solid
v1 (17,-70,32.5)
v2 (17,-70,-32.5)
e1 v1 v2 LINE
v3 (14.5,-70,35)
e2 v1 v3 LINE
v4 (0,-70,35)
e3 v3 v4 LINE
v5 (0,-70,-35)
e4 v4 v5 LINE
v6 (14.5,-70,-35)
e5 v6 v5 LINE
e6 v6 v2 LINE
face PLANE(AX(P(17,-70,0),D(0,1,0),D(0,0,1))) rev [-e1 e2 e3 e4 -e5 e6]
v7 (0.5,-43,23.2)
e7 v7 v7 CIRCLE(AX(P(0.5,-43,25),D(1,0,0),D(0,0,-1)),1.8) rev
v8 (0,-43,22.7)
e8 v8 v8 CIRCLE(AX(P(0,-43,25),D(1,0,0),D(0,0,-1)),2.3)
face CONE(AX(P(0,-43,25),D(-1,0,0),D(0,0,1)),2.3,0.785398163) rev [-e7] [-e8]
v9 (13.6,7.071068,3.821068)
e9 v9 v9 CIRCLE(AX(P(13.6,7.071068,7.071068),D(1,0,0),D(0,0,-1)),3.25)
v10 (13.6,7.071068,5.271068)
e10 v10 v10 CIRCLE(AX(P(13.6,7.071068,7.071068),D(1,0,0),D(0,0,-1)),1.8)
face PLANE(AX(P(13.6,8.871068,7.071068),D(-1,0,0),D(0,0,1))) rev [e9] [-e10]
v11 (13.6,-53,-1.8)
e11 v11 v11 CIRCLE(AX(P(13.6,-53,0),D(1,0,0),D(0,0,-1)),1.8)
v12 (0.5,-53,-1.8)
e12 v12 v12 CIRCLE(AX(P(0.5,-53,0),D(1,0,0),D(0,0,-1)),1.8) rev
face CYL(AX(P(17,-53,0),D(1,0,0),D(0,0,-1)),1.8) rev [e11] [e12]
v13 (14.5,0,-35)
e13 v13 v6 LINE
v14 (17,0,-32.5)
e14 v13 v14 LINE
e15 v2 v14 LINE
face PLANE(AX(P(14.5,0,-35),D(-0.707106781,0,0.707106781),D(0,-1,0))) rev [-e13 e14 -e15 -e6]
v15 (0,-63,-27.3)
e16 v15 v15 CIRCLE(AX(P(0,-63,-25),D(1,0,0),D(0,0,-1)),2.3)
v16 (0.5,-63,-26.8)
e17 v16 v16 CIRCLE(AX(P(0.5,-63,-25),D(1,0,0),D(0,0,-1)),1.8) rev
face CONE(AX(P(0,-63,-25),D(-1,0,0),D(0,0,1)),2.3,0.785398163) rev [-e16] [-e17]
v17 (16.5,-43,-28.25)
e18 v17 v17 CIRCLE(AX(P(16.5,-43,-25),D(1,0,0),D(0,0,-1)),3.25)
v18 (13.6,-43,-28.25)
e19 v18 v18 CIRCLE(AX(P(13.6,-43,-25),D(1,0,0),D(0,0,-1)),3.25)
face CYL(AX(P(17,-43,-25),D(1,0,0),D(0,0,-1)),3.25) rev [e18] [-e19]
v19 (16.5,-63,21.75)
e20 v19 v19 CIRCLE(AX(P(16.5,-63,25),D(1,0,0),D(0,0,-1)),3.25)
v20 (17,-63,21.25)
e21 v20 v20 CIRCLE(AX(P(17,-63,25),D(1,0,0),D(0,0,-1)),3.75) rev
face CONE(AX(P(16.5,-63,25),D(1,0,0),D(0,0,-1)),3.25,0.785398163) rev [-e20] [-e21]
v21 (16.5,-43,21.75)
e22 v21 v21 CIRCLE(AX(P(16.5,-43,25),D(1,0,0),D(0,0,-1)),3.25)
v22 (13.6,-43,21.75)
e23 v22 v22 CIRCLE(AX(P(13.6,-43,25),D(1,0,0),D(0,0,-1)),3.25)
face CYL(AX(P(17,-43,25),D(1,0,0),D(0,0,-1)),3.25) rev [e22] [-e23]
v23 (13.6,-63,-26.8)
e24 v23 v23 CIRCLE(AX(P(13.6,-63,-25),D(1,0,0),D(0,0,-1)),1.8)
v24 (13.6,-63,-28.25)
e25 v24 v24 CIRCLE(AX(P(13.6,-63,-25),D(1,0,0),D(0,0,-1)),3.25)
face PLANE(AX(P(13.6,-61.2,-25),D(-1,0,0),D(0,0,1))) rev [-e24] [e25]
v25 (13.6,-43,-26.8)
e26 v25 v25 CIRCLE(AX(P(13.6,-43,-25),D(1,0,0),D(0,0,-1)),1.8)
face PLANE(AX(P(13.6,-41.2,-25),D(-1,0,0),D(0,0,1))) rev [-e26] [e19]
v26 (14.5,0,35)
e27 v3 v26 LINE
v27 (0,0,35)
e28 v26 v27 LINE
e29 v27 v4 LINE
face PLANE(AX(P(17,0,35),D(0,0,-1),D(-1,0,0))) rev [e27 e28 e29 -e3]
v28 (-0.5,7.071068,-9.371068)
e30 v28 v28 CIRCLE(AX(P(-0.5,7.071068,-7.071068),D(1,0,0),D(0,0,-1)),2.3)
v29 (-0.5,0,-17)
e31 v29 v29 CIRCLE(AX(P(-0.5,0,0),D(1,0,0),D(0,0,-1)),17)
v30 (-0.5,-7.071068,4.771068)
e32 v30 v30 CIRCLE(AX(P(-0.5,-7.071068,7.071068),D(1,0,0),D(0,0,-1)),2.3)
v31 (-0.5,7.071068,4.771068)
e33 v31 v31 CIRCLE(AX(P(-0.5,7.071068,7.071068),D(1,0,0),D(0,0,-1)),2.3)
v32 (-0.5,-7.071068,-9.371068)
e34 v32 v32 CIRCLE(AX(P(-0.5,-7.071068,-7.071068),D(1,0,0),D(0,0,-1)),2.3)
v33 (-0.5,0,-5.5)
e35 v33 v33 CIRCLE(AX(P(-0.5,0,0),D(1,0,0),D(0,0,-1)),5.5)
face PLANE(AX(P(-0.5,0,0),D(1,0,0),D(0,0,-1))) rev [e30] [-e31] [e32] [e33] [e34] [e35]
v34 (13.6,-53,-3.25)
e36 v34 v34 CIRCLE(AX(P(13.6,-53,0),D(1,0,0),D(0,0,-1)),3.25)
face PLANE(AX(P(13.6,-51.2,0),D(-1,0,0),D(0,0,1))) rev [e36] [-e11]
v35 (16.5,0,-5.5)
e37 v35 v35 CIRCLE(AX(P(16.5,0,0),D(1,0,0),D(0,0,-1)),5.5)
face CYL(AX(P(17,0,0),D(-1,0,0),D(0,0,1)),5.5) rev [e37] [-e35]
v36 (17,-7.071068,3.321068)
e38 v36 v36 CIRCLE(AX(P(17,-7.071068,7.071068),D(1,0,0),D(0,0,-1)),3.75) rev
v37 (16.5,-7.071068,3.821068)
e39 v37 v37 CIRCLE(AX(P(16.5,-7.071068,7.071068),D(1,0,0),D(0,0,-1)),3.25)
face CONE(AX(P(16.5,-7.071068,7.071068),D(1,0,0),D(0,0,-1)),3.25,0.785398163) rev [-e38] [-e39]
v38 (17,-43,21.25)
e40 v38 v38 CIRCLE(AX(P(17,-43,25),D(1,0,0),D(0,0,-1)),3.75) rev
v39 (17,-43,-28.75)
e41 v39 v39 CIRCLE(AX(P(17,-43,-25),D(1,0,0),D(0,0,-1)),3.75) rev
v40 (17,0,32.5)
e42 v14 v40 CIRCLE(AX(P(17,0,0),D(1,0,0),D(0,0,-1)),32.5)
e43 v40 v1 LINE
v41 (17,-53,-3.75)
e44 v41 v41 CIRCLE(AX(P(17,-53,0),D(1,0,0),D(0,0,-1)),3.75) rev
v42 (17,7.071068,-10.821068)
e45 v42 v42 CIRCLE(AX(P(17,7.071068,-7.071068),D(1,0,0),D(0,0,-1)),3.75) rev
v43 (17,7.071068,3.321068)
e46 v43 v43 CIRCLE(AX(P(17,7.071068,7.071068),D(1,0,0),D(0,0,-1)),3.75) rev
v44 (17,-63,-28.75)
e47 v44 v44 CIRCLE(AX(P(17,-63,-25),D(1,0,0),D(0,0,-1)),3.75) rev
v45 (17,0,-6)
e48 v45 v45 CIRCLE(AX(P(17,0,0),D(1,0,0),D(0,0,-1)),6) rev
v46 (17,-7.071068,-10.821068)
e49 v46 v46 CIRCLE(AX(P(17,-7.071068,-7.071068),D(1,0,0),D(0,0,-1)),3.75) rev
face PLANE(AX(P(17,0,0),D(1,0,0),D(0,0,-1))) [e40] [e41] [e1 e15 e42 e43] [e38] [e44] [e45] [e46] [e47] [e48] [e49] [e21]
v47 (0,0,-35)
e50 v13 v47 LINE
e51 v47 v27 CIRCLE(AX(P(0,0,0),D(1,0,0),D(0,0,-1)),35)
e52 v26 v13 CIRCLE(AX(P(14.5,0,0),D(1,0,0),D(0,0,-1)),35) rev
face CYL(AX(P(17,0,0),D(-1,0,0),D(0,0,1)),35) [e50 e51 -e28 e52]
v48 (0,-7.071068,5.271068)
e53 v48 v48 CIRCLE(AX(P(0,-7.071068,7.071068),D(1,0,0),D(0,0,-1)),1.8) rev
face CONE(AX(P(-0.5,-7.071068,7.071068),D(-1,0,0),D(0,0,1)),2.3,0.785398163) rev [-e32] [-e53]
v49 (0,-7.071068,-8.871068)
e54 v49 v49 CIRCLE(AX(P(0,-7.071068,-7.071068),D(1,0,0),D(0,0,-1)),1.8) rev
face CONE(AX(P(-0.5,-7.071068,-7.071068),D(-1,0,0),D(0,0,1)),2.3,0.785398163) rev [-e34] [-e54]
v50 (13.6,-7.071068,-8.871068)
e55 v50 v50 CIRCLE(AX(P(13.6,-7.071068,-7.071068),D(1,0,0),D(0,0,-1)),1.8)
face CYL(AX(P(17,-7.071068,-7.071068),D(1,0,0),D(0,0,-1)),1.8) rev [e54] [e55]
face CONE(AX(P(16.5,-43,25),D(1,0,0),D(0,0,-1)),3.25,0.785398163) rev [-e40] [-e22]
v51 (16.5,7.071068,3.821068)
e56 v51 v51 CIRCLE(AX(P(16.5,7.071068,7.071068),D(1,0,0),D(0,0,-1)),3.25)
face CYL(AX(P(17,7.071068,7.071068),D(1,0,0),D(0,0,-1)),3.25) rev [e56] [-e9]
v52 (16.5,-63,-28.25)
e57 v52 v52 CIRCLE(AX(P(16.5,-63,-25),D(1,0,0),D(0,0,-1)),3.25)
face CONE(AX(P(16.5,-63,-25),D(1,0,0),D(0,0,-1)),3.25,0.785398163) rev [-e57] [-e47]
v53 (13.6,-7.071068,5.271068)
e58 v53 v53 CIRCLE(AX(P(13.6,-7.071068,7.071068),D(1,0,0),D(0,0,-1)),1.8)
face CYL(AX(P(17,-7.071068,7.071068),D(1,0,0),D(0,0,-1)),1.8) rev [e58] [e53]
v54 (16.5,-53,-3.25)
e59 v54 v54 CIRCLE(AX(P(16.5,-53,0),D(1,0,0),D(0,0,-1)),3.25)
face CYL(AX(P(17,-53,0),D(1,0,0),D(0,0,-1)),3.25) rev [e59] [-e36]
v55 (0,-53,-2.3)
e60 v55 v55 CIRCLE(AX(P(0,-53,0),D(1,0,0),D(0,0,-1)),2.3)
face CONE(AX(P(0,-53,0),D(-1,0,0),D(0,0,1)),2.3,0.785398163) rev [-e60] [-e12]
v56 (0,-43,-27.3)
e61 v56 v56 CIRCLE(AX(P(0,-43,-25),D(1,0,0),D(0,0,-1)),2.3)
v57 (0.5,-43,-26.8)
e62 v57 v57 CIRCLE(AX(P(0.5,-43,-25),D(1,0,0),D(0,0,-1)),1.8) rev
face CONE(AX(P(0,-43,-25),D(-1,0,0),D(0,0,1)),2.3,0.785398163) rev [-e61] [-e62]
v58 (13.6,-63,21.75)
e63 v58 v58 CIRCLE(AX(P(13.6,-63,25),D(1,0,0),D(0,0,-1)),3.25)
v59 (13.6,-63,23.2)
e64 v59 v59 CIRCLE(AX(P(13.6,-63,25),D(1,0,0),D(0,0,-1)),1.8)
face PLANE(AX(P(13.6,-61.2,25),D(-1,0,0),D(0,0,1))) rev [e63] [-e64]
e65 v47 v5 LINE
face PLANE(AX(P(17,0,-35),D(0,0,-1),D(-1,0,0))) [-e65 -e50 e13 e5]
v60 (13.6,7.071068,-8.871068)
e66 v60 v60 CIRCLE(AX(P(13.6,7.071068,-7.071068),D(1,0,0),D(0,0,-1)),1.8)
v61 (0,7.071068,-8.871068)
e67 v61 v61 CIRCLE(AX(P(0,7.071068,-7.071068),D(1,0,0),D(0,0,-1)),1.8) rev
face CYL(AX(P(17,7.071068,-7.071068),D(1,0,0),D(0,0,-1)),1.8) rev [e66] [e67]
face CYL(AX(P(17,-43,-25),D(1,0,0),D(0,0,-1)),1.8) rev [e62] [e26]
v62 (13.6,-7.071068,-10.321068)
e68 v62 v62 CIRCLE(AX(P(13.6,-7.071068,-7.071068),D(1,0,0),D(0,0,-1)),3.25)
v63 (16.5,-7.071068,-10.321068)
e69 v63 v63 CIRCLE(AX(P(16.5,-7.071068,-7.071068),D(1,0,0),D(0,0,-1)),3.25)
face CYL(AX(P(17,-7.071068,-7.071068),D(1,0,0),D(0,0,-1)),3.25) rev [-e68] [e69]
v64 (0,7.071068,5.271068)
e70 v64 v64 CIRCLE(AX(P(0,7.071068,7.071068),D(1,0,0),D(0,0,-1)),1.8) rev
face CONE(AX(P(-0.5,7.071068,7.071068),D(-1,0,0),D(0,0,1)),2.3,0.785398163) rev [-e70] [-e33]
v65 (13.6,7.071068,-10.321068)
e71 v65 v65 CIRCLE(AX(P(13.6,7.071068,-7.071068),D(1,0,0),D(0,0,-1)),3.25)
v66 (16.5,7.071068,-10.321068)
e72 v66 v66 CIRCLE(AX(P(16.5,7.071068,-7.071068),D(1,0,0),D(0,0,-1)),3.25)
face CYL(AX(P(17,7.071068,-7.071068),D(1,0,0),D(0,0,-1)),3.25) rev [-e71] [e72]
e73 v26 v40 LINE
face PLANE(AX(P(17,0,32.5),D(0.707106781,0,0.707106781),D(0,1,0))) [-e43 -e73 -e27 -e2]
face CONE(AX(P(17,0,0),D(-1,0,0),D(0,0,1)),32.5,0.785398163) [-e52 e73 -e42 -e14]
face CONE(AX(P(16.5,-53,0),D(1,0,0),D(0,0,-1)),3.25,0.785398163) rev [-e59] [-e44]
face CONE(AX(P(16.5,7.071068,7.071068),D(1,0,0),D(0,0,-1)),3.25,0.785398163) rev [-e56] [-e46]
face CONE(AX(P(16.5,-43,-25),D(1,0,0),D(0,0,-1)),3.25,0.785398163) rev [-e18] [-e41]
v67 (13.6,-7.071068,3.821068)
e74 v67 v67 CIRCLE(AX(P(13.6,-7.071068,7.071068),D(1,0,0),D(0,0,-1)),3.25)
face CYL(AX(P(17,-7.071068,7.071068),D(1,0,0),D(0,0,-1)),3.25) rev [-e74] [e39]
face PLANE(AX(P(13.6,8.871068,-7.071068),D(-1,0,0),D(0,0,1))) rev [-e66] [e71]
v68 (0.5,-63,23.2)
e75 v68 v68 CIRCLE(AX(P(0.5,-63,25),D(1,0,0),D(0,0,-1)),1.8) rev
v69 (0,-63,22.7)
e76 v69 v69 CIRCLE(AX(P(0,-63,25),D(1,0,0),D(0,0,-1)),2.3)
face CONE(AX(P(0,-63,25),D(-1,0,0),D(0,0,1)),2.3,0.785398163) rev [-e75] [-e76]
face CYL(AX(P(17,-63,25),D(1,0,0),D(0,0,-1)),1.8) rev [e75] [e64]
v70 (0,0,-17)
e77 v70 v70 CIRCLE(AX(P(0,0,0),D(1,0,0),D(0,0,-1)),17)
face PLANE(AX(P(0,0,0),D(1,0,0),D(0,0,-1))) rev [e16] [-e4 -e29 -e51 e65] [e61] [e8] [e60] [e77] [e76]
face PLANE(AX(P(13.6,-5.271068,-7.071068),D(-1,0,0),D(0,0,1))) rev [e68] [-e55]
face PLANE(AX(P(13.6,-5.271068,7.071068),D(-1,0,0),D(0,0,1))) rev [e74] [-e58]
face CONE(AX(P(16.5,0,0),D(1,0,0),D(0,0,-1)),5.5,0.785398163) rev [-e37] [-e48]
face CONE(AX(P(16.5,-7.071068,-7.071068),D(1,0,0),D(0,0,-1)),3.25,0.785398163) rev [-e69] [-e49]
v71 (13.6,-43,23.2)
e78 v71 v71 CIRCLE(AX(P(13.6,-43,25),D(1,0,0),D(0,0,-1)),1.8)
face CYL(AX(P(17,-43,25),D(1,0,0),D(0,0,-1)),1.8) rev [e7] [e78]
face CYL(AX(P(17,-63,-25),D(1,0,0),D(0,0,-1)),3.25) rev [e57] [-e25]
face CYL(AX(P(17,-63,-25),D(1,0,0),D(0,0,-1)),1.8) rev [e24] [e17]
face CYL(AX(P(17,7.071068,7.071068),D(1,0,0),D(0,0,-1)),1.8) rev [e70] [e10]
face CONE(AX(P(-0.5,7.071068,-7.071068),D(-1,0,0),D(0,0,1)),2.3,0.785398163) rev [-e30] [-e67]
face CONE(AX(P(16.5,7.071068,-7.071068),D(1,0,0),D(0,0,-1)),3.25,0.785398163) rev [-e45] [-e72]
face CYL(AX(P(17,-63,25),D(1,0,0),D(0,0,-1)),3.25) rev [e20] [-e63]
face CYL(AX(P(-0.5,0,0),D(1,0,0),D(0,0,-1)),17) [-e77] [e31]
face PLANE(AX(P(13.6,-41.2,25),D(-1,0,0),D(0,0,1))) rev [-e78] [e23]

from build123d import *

# Parameters (mm, degrees)
BOSS_EXTRUDE1_DEPTH                           = 17
BOSS_EXTRUDE2_START                           = -0.5
BOSS_EXTRUDE2_DEPTH                           = 0.5
CBORE_START                                   = -0.5
CBORE_FOR_M3_HEX_SOCKET_HEAD_CAP_SCR_2_R      = 1.8
CBORE_FOR_M3_HEX_SOCKET_HEAD_CAP_SCREW1_DEPTH = 17.5
CBORE_START_2                                 = 13.6
CBORE_FOR_M3_HEX_SOCKET_HEAD_CAP_SCR_3_O_R    = 3.25
CBORE_FOR_M3_HEX_SOCKET_HEAD_CAP_SCR_3_O_R_2  = 1.8
CBORE_FOR_M3_HEX_SOCKET_HEAD_CAP_SCR_3_DEPTH  = 3.4
F_2_5MM_CHAMFER1_SIZE                         = 2.5
F_0_5MM_CHAMFER2_SIZE                         = 0.5


# Read off the part's stored shape, not the designer's step: CBORE for M3 Hex Socket Head Cap Screw1
with BuildPart() as part:
    # Sketch1 → Boss-Extrude1 (new body)
    with BuildSketch(Plane(origin=(0, 0, 0), x_dir=(0, 0, -1), z_dir=(1, 0, 0))):
        with BuildLine():
            ThreePointArc((-17, 0), (0, 17), (17, 0))
            Line((17, 0), (35, 0))
            ThreePointArc((35, 0), (0, 35), (-35, 0))
            Line((-35, 0), (-17, 0))
        make_face()
        with BuildLine():
            Line((35, 0), (17, 0))
            ThreePointArc((17, 0), (0, -17), (-17, 0))
            Line((-17, 0), (-35, 0))
            ThreePointArc((-35, 0), (0, -35), (35, 0))
        make_face()
        with BuildLine():
            ThreePointArc((-5.5, 0), (0, 5.5), (5.5, 0))
            Line((5.5, 0), (17, 0))
            ThreePointArc((17, 0), (0, 17), (-17, 0))
            Line((-17, 0), (-5.5, 0))
        make_face()
        with BuildLine():
            Line((17, 0), (5.5, 0))
            ThreePointArc((5.5, 0), (0, -5.5), (-5.5, 0))
            Line((-5.5, 0), (-17, 0))
            ThreePointArc((-17, 0), (0, -17), (17, 0))
        make_face()
        with BuildLine():
            Line((35, -70), (35, 0))
            ThreePointArc((35, 0), (0, -35), (-35, 0))
            Line((-35, 0), (-35, -70))
            Line((-35, -70), (35, -70))
        make_face()
    extrude(amount=BOSS_EXTRUDE1_DEPTH)

    # Sketch1<4> → Boss-Extrude2 (add)
    with BuildSketch(Plane(origin=(0, 0, 0), x_dir=(0, 0, -1), z_dir=(1, 0, 0)).offset(BOSS_EXTRUDE2_START)):
        with BuildLine():
            ThreePointArc((-5.5, 0), (0, 5.5), (5.5, 0))
            Line((5.5, 0), (17, 0))
            ThreePointArc((17, 0), (0, 17), (-17, 0))
            Line((-17, 0), (-5.5, 0))
        make_face()
        with BuildLine():
            Line((17, 0), (5.5, 0))
            ThreePointArc((5.5, 0), (0, -5.5), (-5.5, 0))
            Line((-5.5, 0), (-17, 0))
            ThreePointArc((-17, 0), (0, -17), (17, 0))
        make_face()
    extrude(amount=BOSS_EXTRUDE2_DEPTH)

    # CBORE for M3 Hex Socket Head Cap Scr 2 → CBORE for M3 Hex Socket Head Cap Screw1 (cut)
    with BuildSketch(Plane.YZ.offset(CBORE_START)):
        with Locations((-63, -25)):
            Circle(CBORE_FOR_M3_HEX_SOCKET_HEAD_CAP_SCR_2_R)
        with Locations((-43, 25)):
            Circle(CBORE_FOR_M3_HEX_SOCKET_HEAD_CAP_SCR_2_R)
        with Locations((-63, 25)):
            Circle(CBORE_FOR_M3_HEX_SOCKET_HEAD_CAP_SCR_2_R)
        with Locations((-43, -25)):
            Circle(CBORE_FOR_M3_HEX_SOCKET_HEAD_CAP_SCR_2_R)
        with Locations((-53, 0)):
            Circle(CBORE_FOR_M3_HEX_SOCKET_HEAD_CAP_SCR_2_R)
        with Locations((7.071067812, 7.071067812)):
            Circle(CBORE_FOR_M3_HEX_SOCKET_HEAD_CAP_SCR_2_R)
        with Locations((-7.071067812, 7.071067812)):
            Circle(CBORE_FOR_M3_HEX_SOCKET_HEAD_CAP_SCR_2_R)
        with Locations((-7.071067812, -7.071067812)):
            Circle(CBORE_FOR_M3_HEX_SOCKET_HEAD_CAP_SCR_2_R)
        with Locations((7.071067812, -7.071067812)):
            Circle(CBORE_FOR_M3_HEX_SOCKET_HEAD_CAP_SCR_2_R)
    extrude(amount=CBORE_FOR_M3_HEX_SOCKET_HEAD_CAP_SCREW1_DEPTH, mode=Mode.SUBTRACT)

    # CBORE for M3 Hex Socket Head Cap Scr 3 o → CBORE for M3 Hex Socket Head Cap Scr 3 (cut)
    # profile 1 of 9: a face of its own
    with BuildSketch(Plane.YZ.offset(CBORE_START_2)):
        with Locations((-63, -25)):
            Circle(CBORE_FOR_M3_HEX_SOCKET_HEAD_CAP_SCR_3_O_R)
        with Locations((-63, -25)):
            Circle(CBORE_FOR_M3_HEX_SOCKET_HEAD_CAP_SCR_3_O_R_2, mode=Mode.SUBTRACT)
    # profile 2 of 9: a face of its own
    with BuildSketch(Plane.YZ.offset(CBORE_START_2)):
        with Locations((-43, 25)):
            Circle(CBORE_FOR_M3_HEX_SOCKET_HEAD_CAP_SCR_3_O_R)
        with Locations((-43, 25)):
            Circle(CBORE_FOR_M3_HEX_SOCKET_HEAD_CAP_SCR_3_O_R_2, mode=Mode.SUBTRACT)
    # profile 3 of 9: a face of its own
    with BuildSketch(Plane.YZ.offset(CBORE_START_2)):
        with Locations((-63, 25)):
            Circle(CBORE_FOR_M3_HEX_SOCKET_HEAD_CAP_SCR_3_O_R)
        with Locations((-63, 25)):
            Circle(CBORE_FOR_M3_HEX_SOCKET_HEAD_CAP_SCR_3_O_R_2, mode=Mode.SUBTRACT)
    # profile 4 of 9: a face of its own
    with BuildSketch(Plane.YZ.offset(CBORE_START_2)):
        with Locations((-43, -25)):
            Circle(CBORE_FOR_M3_HEX_SOCKET_HEAD_CAP_SCR_3_O_R)
        with Locations((-43, -25)):
            Circle(CBORE_FOR_M3_HEX_SOCKET_HEAD_CAP_SCR_3_O_R_2, mode=Mode.SUBTRACT)
    # profile 5 of 9: a face of its own
    with BuildSketch(Plane.YZ.offset(CBORE_START_2)):
        with Locations((-53, 0)):
            Circle(CBORE_FOR_M3_HEX_SOCKET_HEAD_CAP_SCR_3_O_R)
        with Locations((-53, 0)):
            Circle(CBORE_FOR_M3_HEX_SOCKET_HEAD_CAP_SCR_3_O_R_2, mode=Mode.SUBTRACT)
    # profile 6 of 9: a face of its own
    with BuildSketch(Plane.YZ.offset(CBORE_START_2)):
        with Locations((7.071067812, 7.071067812)):
            Circle(CBORE_FOR_M3_HEX_SOCKET_HEAD_CAP_SCR_3_O_R)
        with Locations((7.071067812, 7.071067812)):
            Circle(CBORE_FOR_M3_HEX_SOCKET_HEAD_CAP_SCR_3_O_R_2, mode=Mode.SUBTRACT)
    # profile 7 of 9: a face of its own
    with BuildSketch(Plane.YZ.offset(CBORE_START_2)):
        with Locations((-7.071067812, 7.071067812)):
            Circle(CBORE_FOR_M3_HEX_SOCKET_HEAD_CAP_SCR_3_O_R)
        with Locations((-7.071067812, 7.071067812)):
            Circle(CBORE_FOR_M3_HEX_SOCKET_HEAD_CAP_SCR_3_O_R_2, mode=Mode.SUBTRACT)
    # profile 8 of 9: a face of its own
    with BuildSketch(Plane.YZ.offset(CBORE_START_2)):
        with Locations((-7.071067812, -7.071067812)):
            Circle(CBORE_FOR_M3_HEX_SOCKET_HEAD_CAP_SCR_3_O_R)
        with Locations((-7.071067812, -7.071067812)):
            Circle(CBORE_FOR_M3_HEX_SOCKET_HEAD_CAP_SCR_3_O_R_2, mode=Mode.SUBTRACT)
    # profile 9 of 9: a face of its own
    with BuildSketch(Plane.YZ.offset(CBORE_START_2)):
        with Locations((7.071067812, -7.071067812)):
            Circle(CBORE_FOR_M3_HEX_SOCKET_HEAD_CAP_SCR_3_O_R)
        with Locations((7.071067812, -7.071067812)):
            Circle(CBORE_FOR_M3_HEX_SOCKET_HEAD_CAP_SCR_3_O_R_2, mode=Mode.SUBTRACT)
    extrude(amount=CBORE_FOR_M3_HEX_SOCKET_HEAD_CAP_SCR_3_DEPTH, mode=Mode.SUBTRACT)

    # 2,5mm Chamfer1
    f_2_5mm_chamfer1_edges = [part.edges().sort_by_distance(p)[0] for p in [
        (17, 35, 0),
        (17, -35, 35),
        (17, -35, -35),
    ]]
    chamfer(f_2_5mm_chamfer1_edges, length=F_2_5MM_CHAMFER1_SIZE)

    # 0,5mm Chamfer2
    f_0_5mm_chamfer2_edges = [part.edges().sort_by_distance(p)[0] for p in [
        (0, -64.8, -25),
        (17, -66.25, -25),
        (0, -44.8, 25),
        (17, -46.25, 25),
        (0, -64.8, 25),
        (17, -66.25, 25),
        (0, -44.8, -25),
        (17, -46.25, -25),
        (17, 0, 5.5),
        (0, -54.8, 0),
        (17, -56.25, 0),
        (17, 3.821067812, 7.071067812),
        (-0.5, 5.271067812, 7.071067812),
        (17, -10.321067812, 7.071067812),
        (-0.5, -8.871067812, 7.071067812),
        (17, -10.321067812, -7.071067812),
        (-0.5, -8.871067812, -7.071067812),
        (17, 3.821067812, -7.071067812),
        (-0.5, 5.271067812, -7.071067812),
    ]]
    chamfer(f_0_5mm_chamfer2_edges, length=F_0_5MM_CHAMFER2_SIZE)


solid = part.part
